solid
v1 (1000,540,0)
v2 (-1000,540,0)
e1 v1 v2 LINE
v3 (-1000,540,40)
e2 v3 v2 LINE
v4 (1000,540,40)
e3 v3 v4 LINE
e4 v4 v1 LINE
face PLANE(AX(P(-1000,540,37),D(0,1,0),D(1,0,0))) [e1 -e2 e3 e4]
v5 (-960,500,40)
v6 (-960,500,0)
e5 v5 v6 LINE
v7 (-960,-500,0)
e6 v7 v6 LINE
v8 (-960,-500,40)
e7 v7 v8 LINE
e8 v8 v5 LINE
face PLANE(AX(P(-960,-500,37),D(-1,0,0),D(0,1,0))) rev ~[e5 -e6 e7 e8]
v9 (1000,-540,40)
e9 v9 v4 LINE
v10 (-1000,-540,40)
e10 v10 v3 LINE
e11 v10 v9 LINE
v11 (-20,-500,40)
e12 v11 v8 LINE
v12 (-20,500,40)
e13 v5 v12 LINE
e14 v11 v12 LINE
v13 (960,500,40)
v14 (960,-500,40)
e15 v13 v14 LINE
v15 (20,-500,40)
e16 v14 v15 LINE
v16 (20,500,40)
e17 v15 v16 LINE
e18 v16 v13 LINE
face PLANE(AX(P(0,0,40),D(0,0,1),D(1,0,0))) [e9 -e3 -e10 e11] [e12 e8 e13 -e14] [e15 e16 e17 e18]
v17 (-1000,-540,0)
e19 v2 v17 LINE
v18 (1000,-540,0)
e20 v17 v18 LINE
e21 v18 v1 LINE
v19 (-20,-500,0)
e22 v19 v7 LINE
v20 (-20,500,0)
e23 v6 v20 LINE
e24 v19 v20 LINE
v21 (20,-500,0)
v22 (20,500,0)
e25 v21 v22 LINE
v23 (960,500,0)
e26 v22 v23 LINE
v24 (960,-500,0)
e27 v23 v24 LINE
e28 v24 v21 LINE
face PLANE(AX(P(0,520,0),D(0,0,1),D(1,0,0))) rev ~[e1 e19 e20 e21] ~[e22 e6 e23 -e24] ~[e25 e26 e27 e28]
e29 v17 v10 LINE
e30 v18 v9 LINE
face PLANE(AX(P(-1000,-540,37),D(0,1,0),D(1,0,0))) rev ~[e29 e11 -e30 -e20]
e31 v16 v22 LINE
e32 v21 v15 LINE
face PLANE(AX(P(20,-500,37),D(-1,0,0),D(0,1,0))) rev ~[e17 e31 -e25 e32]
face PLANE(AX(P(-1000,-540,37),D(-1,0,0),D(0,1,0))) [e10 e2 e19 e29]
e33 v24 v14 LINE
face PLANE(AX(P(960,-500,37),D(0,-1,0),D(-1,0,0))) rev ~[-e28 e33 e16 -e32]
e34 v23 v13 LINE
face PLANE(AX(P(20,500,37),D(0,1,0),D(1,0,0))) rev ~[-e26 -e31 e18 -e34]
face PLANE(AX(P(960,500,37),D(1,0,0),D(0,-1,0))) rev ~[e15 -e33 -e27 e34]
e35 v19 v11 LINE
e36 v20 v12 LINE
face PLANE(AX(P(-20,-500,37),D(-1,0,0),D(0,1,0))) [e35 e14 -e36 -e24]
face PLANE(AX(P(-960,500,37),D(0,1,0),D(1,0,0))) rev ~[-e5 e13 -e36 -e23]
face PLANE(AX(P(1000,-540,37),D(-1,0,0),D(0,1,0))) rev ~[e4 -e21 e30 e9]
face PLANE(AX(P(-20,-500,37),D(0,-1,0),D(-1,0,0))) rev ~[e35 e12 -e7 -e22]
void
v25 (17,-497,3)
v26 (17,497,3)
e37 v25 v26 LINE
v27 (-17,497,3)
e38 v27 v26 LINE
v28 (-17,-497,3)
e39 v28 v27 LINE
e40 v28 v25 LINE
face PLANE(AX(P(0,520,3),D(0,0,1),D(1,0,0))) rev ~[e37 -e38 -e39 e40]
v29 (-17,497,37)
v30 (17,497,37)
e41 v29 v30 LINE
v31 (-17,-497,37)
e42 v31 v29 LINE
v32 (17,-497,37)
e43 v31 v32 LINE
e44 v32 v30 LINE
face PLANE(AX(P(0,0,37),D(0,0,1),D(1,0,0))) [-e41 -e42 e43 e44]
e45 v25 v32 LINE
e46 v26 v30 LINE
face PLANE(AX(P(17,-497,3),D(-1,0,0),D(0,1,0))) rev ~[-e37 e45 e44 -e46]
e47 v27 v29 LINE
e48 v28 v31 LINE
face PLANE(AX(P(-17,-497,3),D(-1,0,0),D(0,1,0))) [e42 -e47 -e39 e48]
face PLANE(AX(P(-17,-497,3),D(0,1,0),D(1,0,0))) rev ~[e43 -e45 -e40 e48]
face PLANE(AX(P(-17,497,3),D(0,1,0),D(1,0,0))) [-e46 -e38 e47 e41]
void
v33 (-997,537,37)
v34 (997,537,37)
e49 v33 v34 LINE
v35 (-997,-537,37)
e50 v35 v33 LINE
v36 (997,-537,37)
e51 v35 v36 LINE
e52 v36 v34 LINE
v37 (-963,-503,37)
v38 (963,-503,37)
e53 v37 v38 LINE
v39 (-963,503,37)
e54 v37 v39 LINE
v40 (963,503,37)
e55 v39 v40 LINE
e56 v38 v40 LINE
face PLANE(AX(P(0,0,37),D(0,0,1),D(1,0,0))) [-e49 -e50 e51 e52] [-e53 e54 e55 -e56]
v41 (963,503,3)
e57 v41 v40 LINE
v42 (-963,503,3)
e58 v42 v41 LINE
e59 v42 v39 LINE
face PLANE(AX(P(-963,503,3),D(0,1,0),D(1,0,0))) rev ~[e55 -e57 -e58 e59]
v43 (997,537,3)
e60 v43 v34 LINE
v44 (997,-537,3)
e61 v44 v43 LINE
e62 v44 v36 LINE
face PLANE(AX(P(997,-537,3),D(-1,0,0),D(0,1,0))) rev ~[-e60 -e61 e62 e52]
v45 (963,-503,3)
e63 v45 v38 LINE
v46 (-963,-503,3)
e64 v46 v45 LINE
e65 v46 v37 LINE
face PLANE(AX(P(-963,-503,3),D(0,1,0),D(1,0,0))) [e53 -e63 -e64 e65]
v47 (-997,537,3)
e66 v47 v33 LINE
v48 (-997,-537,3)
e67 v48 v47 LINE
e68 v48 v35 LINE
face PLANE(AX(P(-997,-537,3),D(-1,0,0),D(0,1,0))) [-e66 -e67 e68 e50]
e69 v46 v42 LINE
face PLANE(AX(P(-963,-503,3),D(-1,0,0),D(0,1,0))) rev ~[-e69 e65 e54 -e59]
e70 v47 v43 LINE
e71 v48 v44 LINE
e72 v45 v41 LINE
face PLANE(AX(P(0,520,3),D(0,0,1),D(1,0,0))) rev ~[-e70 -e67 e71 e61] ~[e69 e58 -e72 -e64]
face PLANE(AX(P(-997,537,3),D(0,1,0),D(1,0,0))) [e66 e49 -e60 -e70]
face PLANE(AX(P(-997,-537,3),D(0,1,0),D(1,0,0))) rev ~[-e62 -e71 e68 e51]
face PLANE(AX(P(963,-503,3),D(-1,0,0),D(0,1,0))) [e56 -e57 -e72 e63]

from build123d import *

# Parameters (mm, degrees)
F0_W     = 40
F0_H     = 40
F0_H_2   = 1000
F1_DEPTH = 3
F2_W     = 2000
F2_H     = 1080
F2_W_2   = 1994
F2_H_2   = 1074
F2_W_3   = 1926
F2_H_3   = 1006
F2_W_4   = 40
F2_H_4   = 1000
F2_W_5   = 34
F2_H_5   = 994
F3_DEPTH = 34
F4_W     = 2000
F4_H     = 1080
F4_W_2   = 40
F4_H_2   = 1000
F4_W_3   = 34
F4_H_3   = 994
F5_DEPTH = 3


with BuildPart() as f1:
    # F0 (on Top) → F1 (new body)
    with BuildSketch(Plane.XY):
        with Locations((0, 520)):
            Rectangle(F0_W, F0_H)
        Polygon((-20, 500), (-20, 540), (-1000, 540), (-1000, -540), (-20, -540), (-20, -500), (-960, -500), (-960, 500), align=None)
        Polygon((1000, 540), (20, 540), (20, 500), (960, 500), (960, -500), (20, -500), (20, -540), (1000, -540), align=None)
        with Locations((0, -520)):
            Rectangle(F0_W, F0_H)
        Rectangle(F0_W, F0_H_2)
    extrude(amount=F1_DEPTH)

    # F2 (on face) → F3 (join)
    with BuildSketch(Plane.XY.offset(3)):
        Rectangle(F2_W, F2_H)
        Rectangle(F2_W_2, F2_H_2, mode=Mode.SUBTRACT)
        Rectangle(F2_W_3, F2_H_3)
        Polygon((-20, 500), (20, 500), (960, 500), (960, -500), (20, -500), (-20, -500), (-960, -500), (-960, 500), align=None, mode=Mode.SUBTRACT)
        Rectangle(F2_W_4, F2_H_4)
        Rectangle(F2_W_5, F2_H_5, mode=Mode.SUBTRACT)
    extrude(amount=F3_DEPTH)

    # F4 (on face) → F5 (join)
    with BuildSketch(Plane.XY.offset(37)):
        Rectangle(F4_W, F4_H)
        Polygon((20, 500), (960, 500), (960, -500), (20, -500), (-20, -500), (-960, -500), (-960, 500), (-20, 500), align=None, mode=Mode.SUBTRACT)
        Rectangle(F4_W_2, F4_H_2)
        Rectangle(F4_W_3, F4_H_3, mode=Mode.SUBTRACT)
        Rectangle(F4_W_3, F4_H_3)
    extrude(amount=F5_DEPTH)


solid = f1.part
